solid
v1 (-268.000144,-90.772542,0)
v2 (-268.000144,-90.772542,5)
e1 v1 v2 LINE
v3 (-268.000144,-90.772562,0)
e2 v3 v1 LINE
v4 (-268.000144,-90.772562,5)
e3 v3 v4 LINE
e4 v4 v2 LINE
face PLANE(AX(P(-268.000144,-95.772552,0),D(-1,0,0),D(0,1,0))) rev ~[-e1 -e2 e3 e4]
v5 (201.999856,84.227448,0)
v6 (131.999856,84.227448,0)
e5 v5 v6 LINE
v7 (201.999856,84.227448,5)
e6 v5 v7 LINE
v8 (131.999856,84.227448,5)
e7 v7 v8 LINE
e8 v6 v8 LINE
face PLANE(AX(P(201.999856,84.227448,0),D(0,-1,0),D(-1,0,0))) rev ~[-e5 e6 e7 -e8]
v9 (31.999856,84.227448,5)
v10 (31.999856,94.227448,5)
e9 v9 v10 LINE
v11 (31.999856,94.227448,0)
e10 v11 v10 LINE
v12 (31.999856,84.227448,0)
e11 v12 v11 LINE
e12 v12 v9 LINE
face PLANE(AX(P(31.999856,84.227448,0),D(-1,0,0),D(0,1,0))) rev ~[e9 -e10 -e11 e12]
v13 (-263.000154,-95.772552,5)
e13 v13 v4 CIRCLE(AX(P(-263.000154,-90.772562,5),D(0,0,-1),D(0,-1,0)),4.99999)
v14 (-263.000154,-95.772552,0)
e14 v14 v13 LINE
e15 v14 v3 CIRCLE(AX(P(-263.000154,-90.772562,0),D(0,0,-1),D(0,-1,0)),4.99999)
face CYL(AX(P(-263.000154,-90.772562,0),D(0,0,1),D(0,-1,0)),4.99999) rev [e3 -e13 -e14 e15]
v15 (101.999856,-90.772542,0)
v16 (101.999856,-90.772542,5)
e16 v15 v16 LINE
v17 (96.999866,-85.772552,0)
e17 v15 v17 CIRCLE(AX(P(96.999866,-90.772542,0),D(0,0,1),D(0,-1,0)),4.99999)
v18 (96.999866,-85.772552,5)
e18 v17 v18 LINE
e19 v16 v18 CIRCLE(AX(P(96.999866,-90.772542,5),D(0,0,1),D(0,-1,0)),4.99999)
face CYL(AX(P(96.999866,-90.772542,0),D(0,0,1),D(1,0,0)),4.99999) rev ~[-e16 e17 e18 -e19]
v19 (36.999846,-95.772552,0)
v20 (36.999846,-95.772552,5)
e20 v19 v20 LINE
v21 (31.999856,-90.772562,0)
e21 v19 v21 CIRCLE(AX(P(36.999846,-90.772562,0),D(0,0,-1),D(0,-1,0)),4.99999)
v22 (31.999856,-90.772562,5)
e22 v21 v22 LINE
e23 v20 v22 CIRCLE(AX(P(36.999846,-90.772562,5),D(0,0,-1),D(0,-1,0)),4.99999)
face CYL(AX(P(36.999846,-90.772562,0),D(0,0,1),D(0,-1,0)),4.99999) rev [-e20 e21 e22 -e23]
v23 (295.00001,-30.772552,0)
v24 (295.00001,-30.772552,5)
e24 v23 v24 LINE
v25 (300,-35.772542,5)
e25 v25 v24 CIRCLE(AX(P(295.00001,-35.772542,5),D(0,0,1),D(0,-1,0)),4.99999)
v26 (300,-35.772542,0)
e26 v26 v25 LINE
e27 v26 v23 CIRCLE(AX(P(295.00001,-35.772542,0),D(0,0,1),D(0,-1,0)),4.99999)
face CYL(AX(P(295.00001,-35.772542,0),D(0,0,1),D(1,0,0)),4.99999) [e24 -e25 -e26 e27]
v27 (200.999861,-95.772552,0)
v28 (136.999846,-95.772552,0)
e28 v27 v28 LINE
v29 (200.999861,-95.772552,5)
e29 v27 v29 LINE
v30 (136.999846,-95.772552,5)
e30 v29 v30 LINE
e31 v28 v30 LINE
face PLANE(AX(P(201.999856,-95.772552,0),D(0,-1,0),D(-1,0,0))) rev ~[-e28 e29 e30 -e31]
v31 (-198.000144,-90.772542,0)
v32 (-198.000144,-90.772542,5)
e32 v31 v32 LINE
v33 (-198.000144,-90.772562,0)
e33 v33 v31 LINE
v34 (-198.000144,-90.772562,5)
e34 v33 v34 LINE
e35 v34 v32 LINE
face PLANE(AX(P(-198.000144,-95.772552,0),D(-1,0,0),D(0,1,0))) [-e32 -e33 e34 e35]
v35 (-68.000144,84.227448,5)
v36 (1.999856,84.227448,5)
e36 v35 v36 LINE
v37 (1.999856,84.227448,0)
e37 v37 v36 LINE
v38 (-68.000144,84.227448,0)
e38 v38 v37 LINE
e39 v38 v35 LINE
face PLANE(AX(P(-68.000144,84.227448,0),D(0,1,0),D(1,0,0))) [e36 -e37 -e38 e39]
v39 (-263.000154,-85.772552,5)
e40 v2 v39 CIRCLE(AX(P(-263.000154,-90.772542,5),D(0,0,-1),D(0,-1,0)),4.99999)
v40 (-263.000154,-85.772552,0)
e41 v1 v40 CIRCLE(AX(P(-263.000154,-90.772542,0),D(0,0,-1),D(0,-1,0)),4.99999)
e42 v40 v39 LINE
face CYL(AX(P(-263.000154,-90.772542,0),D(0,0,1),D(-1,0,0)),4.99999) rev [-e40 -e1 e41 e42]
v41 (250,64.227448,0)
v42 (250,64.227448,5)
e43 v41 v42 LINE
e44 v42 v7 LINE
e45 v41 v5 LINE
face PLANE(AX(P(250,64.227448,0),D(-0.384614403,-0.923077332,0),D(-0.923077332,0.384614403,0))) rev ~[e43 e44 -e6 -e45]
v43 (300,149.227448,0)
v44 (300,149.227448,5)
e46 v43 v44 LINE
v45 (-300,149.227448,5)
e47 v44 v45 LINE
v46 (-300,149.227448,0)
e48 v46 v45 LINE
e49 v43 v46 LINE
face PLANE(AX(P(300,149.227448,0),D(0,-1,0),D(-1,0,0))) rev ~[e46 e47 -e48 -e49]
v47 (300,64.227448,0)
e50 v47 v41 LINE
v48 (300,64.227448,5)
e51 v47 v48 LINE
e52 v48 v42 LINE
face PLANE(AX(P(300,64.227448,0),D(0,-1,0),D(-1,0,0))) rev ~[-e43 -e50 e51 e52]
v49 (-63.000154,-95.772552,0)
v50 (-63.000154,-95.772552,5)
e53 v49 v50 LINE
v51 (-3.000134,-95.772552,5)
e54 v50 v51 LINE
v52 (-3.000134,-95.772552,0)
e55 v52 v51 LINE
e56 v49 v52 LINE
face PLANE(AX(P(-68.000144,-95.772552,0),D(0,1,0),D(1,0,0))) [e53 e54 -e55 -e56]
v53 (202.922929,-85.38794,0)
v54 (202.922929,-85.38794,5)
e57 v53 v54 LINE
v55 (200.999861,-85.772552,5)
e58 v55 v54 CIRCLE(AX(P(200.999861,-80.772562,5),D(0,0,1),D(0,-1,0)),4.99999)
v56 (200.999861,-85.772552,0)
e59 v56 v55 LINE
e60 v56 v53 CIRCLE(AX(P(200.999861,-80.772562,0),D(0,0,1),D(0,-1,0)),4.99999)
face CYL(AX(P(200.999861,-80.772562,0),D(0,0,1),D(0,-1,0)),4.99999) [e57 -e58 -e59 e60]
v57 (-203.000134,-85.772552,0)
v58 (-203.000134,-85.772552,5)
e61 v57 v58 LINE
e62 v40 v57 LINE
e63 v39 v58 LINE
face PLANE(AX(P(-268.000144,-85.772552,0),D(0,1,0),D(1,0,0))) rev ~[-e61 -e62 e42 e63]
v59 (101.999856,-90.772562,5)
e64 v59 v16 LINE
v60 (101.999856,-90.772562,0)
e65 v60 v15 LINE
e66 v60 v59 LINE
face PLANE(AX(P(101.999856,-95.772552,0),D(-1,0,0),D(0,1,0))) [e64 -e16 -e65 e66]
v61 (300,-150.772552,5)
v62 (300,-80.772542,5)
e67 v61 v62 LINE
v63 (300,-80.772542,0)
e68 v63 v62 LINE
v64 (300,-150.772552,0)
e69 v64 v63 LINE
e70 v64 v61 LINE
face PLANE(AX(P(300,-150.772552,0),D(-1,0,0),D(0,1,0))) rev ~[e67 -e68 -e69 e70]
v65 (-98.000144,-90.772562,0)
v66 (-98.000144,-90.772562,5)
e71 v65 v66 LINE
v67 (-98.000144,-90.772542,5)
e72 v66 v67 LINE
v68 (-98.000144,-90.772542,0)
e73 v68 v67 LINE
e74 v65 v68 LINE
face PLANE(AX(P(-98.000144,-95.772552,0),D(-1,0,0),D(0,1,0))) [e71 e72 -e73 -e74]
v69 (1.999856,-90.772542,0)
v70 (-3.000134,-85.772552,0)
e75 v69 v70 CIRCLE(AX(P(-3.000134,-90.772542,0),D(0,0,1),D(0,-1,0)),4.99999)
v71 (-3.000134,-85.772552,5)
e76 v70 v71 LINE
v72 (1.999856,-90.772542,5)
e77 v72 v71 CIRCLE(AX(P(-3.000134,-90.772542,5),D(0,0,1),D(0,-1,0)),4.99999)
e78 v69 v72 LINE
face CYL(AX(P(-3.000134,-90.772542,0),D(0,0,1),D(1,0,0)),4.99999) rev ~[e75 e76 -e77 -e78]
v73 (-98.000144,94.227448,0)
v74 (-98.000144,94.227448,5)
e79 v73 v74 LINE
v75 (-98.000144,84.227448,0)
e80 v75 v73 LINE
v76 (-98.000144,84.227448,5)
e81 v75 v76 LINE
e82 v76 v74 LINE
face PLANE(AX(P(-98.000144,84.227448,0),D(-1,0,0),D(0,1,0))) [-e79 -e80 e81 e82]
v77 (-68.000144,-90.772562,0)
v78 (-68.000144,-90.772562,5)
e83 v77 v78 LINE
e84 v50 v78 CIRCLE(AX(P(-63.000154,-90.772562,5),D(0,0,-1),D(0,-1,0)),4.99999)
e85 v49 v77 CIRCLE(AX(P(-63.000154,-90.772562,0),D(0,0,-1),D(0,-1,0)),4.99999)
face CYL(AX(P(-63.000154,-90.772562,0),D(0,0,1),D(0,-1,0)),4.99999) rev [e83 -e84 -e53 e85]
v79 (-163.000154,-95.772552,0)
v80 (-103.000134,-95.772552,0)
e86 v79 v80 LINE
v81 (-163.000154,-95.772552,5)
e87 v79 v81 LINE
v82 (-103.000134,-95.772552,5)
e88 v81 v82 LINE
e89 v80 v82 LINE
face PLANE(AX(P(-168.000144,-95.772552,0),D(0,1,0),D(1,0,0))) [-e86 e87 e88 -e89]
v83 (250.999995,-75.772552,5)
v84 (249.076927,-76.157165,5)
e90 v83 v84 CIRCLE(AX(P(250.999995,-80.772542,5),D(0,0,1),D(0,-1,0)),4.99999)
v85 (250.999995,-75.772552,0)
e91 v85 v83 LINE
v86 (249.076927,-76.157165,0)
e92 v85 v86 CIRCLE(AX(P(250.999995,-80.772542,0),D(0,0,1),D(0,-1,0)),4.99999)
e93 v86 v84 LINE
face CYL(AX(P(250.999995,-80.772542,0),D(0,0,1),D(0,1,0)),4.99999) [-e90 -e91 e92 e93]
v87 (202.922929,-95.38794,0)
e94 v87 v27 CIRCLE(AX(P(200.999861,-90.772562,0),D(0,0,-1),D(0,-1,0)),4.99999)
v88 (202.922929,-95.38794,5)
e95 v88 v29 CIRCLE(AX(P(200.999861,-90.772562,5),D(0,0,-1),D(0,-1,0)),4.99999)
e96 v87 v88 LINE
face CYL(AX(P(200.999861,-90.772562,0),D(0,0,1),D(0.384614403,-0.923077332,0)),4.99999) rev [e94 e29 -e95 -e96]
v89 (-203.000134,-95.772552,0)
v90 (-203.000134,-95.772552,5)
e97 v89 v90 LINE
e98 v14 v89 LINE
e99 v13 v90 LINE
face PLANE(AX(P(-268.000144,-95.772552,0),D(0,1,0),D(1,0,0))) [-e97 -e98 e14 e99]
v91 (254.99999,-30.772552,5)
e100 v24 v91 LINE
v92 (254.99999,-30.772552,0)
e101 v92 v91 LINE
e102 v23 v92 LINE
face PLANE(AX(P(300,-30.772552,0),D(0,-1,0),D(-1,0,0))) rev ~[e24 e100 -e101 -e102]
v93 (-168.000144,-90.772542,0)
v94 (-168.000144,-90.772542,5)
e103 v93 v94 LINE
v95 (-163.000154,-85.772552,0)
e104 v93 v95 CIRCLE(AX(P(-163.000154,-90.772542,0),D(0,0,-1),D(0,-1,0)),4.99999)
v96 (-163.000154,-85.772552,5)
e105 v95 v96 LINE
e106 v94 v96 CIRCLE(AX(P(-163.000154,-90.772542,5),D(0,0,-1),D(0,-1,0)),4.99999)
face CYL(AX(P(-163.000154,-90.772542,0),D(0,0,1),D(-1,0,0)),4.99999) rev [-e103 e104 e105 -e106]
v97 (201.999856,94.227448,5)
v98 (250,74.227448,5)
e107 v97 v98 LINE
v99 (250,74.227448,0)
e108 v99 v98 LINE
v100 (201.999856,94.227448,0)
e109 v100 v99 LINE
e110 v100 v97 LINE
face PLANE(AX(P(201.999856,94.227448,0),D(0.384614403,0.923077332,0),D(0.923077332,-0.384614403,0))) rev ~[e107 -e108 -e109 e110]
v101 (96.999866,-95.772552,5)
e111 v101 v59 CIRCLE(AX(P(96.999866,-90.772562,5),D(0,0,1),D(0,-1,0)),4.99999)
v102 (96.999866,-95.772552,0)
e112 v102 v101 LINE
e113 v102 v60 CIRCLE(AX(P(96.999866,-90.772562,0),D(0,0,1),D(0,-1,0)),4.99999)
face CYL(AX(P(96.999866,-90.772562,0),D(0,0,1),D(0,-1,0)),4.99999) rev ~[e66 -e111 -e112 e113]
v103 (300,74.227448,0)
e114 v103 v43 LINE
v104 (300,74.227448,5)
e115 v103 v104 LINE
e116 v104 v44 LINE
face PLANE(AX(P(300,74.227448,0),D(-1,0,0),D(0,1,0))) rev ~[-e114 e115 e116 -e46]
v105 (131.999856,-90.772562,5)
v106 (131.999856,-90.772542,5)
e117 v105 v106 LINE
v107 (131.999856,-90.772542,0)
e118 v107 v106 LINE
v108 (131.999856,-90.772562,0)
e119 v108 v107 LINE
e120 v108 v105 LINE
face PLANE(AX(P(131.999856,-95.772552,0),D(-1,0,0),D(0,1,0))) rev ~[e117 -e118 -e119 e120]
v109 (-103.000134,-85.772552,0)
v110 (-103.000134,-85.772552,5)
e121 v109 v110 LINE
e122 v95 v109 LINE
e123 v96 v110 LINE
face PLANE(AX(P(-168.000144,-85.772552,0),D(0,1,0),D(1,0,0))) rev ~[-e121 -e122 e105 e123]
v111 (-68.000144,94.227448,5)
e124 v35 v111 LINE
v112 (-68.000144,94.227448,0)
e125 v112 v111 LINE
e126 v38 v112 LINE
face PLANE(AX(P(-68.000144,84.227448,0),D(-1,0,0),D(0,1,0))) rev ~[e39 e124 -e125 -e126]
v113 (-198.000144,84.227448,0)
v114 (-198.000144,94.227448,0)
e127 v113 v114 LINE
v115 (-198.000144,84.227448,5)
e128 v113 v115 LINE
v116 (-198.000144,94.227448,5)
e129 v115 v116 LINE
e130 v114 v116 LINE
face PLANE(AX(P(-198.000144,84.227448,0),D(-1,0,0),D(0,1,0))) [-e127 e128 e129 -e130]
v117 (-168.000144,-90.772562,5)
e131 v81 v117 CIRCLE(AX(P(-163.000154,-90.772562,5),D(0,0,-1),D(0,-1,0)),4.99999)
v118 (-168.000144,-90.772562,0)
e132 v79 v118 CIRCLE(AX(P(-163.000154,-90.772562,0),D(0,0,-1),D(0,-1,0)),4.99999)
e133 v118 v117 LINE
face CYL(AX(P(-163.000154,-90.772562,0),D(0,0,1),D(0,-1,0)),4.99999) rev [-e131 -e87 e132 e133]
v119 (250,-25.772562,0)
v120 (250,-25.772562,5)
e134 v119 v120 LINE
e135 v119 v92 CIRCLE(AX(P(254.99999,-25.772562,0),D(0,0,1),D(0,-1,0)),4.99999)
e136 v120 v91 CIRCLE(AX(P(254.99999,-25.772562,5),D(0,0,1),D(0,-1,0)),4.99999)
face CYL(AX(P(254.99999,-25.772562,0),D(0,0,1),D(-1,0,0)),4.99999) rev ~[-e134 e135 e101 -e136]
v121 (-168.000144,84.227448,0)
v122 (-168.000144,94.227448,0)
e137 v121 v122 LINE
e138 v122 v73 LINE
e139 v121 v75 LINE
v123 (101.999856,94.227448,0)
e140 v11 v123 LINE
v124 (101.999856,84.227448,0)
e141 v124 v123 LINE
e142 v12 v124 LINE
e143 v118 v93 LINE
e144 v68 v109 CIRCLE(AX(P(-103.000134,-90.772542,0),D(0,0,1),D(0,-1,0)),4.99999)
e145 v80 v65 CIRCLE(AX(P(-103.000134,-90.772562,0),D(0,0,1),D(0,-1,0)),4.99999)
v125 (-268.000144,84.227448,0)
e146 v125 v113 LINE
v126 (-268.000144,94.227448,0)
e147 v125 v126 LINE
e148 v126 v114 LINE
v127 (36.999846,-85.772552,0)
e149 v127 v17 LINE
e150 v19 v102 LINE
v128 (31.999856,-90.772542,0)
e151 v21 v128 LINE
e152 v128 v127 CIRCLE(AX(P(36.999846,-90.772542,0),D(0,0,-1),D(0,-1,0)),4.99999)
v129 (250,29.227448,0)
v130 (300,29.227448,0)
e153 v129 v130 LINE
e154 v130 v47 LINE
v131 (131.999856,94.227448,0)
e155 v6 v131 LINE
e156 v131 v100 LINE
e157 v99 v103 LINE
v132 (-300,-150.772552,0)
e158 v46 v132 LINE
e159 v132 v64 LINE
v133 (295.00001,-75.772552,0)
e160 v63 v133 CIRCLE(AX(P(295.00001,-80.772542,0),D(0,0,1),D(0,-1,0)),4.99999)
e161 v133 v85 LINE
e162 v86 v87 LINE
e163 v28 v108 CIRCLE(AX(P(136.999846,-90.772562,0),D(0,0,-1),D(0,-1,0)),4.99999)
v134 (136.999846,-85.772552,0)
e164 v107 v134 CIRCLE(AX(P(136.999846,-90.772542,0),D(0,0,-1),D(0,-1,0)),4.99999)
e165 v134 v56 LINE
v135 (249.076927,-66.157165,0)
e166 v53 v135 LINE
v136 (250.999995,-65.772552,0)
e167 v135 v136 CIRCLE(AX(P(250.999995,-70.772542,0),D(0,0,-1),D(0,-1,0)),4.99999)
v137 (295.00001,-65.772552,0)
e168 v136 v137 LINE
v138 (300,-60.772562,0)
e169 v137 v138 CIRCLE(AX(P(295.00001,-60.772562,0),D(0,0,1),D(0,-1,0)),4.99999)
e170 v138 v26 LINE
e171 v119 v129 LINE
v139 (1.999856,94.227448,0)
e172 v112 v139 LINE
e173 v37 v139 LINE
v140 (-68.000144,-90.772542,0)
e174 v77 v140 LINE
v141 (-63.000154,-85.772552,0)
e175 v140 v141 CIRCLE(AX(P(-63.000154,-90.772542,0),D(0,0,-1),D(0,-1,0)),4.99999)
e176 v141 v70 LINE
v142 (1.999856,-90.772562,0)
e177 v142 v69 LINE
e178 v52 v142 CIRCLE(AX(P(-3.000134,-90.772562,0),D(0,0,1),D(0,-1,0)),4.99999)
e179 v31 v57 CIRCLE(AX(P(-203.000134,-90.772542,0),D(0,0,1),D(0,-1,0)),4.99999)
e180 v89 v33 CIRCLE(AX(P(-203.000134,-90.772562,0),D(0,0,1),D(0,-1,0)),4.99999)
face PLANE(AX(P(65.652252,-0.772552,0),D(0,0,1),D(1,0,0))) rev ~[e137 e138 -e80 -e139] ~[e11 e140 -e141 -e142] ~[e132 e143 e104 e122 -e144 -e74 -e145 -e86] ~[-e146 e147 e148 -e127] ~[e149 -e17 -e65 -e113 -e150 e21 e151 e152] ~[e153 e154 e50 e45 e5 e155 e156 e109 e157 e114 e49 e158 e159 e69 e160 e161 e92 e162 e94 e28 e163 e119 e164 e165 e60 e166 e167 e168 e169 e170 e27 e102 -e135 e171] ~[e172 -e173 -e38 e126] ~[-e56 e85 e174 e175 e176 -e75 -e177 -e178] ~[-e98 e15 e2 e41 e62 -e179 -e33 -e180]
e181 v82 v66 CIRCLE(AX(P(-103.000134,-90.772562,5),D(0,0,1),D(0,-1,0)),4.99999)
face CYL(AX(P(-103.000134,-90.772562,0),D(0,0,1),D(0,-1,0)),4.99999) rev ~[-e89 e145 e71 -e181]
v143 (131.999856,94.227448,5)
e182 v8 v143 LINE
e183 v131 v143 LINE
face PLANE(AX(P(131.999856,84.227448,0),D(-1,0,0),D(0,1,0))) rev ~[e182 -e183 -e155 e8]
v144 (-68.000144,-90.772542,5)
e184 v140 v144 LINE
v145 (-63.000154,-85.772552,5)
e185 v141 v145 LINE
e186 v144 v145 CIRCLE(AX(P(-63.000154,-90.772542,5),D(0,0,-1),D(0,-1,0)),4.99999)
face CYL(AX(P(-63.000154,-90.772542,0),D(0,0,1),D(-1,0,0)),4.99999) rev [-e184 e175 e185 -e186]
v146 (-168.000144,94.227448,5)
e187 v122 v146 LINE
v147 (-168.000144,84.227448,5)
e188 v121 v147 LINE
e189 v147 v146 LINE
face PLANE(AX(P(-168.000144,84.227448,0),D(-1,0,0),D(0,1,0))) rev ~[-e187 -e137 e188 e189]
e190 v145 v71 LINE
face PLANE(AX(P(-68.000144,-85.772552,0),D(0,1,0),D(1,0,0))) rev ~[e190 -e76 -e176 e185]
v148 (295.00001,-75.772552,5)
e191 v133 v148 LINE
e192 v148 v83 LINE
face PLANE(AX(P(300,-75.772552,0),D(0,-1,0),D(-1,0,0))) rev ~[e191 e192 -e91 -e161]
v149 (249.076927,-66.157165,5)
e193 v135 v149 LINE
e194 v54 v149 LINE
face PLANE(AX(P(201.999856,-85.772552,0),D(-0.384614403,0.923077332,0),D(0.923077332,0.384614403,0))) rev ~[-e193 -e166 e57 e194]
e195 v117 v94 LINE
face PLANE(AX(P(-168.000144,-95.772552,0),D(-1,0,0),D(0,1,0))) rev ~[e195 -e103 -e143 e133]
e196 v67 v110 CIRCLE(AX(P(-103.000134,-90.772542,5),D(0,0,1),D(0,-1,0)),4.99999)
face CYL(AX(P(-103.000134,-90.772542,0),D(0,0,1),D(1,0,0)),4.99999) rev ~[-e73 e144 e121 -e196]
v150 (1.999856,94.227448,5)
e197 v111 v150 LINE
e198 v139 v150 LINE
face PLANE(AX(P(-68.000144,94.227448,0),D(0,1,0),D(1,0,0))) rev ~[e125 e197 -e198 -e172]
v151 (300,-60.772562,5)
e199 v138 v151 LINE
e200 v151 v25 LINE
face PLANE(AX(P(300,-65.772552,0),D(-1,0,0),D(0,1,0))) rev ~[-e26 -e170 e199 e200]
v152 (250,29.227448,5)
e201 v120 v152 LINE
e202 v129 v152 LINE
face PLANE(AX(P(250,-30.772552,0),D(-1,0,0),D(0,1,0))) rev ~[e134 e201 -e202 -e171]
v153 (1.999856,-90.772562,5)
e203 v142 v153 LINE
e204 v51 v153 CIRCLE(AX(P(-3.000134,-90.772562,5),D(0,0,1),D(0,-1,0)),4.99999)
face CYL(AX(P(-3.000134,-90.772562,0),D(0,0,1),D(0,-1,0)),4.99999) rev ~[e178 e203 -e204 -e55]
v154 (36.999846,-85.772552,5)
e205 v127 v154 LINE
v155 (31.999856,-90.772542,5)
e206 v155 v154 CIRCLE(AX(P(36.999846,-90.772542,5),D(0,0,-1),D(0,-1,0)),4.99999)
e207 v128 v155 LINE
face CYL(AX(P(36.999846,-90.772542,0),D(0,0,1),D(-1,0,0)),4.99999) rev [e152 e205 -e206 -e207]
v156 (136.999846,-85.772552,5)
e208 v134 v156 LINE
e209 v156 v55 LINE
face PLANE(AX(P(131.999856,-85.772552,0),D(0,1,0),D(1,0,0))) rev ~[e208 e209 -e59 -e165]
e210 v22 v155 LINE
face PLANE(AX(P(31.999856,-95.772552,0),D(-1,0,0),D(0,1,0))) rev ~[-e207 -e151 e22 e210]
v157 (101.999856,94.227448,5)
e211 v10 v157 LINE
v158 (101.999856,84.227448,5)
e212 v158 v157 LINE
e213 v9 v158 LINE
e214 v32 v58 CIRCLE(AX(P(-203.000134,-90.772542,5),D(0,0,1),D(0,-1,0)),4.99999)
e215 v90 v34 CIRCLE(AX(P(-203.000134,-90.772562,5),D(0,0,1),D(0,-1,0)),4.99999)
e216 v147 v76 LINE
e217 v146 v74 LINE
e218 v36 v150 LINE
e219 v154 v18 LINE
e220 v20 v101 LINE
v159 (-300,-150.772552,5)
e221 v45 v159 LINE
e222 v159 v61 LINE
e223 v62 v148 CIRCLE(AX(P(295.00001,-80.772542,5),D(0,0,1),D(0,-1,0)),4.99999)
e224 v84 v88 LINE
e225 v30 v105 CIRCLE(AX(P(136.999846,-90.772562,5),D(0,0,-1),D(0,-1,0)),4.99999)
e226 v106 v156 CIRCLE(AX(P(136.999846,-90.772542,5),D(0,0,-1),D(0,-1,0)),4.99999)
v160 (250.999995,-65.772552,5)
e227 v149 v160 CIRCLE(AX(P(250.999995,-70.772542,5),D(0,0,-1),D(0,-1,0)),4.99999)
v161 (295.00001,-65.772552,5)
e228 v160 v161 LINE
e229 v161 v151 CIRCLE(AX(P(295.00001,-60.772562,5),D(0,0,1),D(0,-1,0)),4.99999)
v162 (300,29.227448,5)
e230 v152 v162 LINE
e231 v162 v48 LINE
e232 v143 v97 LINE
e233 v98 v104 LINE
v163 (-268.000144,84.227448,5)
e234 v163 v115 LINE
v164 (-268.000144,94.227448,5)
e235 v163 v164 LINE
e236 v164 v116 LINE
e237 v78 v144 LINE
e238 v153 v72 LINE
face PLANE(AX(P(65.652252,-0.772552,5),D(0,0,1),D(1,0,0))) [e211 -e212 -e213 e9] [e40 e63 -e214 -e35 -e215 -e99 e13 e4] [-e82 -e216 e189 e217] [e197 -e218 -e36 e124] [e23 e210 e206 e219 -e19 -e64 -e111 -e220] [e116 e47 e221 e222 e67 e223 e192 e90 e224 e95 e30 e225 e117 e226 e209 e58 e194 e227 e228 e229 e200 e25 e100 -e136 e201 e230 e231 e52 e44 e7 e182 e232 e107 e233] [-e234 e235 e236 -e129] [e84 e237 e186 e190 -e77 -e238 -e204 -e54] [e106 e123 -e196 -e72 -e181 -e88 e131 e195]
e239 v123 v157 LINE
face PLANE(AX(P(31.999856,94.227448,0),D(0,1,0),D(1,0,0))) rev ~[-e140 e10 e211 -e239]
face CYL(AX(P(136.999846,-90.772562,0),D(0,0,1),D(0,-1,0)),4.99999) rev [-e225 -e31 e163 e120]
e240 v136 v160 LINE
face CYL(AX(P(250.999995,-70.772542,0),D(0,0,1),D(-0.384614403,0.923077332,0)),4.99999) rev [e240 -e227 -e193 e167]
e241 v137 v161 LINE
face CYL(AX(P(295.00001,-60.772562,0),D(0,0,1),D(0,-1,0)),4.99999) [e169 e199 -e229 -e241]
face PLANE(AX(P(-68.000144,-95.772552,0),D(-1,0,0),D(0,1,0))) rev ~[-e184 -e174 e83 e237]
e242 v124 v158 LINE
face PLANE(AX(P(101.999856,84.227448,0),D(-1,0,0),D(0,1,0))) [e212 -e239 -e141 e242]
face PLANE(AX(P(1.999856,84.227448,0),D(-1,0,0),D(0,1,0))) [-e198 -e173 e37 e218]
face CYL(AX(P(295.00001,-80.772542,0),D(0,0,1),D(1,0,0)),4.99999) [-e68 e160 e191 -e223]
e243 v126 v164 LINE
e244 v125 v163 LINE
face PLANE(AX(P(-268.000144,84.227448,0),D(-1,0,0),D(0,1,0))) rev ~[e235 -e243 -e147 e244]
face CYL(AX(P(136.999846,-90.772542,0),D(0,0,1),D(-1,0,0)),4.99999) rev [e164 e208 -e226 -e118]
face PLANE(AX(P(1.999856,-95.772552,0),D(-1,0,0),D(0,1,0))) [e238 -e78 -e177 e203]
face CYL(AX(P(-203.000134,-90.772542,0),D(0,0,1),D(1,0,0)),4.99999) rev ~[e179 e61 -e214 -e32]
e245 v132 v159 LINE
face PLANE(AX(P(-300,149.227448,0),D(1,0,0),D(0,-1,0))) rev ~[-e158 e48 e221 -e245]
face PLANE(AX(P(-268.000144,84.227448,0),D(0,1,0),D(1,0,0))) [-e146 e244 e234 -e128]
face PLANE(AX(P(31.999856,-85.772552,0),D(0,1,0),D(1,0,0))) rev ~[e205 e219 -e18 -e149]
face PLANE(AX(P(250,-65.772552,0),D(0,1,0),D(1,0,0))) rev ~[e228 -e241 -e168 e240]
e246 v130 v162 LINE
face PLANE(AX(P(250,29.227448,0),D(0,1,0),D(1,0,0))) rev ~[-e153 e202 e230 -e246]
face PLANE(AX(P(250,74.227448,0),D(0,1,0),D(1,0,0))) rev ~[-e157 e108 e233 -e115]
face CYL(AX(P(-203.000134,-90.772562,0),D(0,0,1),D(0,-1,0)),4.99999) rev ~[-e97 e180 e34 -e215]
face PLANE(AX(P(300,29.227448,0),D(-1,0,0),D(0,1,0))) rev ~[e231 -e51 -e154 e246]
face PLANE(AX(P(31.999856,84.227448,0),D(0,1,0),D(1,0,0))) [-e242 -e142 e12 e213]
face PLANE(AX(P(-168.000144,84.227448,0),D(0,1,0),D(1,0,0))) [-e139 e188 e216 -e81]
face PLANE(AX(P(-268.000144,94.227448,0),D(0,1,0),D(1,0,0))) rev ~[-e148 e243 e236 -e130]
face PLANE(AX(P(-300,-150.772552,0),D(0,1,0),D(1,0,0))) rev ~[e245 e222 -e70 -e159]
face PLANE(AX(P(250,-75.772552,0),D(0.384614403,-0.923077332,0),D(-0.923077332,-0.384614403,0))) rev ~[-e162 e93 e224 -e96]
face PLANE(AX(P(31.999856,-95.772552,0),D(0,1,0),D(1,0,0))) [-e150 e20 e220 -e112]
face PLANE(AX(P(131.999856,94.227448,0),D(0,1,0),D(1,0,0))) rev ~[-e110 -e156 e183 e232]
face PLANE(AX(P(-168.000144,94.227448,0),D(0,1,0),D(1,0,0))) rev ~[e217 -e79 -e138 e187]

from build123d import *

# Parameters (mm, degrees)
F0_W     = 70
F0_H     = 10
F1_DEPTH = 5
F2_R     = 4.99999


# Not quite as in the source:
# - a fillet or chamfer is up to 0.001 mm smaller than in the source, because OpenCascade refuses the exact size


with BuildPart() as f1:
    # F0 (on Top) → F1 (new body)
    with BuildSketch(Plane.XY):
        Polygon((300, 149.2274475843), (-300, 149.2274475843), (-300, -150.7725524157), (300, -150.7725524157), (300, -75.7725524157), (250, -75.7725524157), (201.9998562336, -95.7725524157), (131.9998562336, -95.7725524157), (131.9998562336, -85.7725524157), (201.9998562336, -85.7725524157), (250, -65.7725524157), (300, -65.7725524157), (300, -30.7725524157), (250, -30.7725524157), (250, 29.2274475843), (300, 29.2274475843), (300, 64.2274475843), (250, 64.2274475843), (201.9998562336, 84.2274475843), (131.9998562336, 84.2274475843), (131.9998562336, 94.2274475843), (201.9998562336, 94.2274475843), (250, 74.2274475843), (300, 74.2274475843), align=None)
        with Locations((-233.0001437664, -90.7725524157)):
            Rectangle(F0_W, F0_H, mode=Mode.SUBTRACT)
        with Locations((-133.0001437664, -90.7725524157)):
            Rectangle(F0_W, F0_H, mode=Mode.SUBTRACT)
        with Locations((-33.0001437664, -90.7725524157)):
            Rectangle(F0_W, F0_H, mode=Mode.SUBTRACT)
        with Locations((66.9998562336, -90.7725524157)):
            Rectangle(F0_W, F0_H, mode=Mode.SUBTRACT)
        with Locations((-233.0001437664, 89.2274475843)):
            Rectangle(F0_W, F0_H, mode=Mode.SUBTRACT)
        with Locations((-133.0001437664, 89.2274475843)):
            Rectangle(F0_W, F0_H, mode=Mode.SUBTRACT)
        with Locations((-33.0001437664, 89.2274475843)):
            Rectangle(F0_W, F0_H, mode=Mode.SUBTRACT)
        with Locations((66.9998562336, 89.2274475843)):
            Rectangle(F0_W, F0_H, mode=Mode.SUBTRACT)
    extrude(amount=F1_DEPTH)

    # F2 (radius 5 in the source; OpenCascade refuses exactly that, so slightly less here)
    f2_edges = [f1.edges().sort_by_distance(p)[0] for p in [
        (131.999856, -95.772552, 2.5),
        (31.999856, -95.772552, 2.5),
        (-68.000144, -95.772552, 2.5),
        (201.999856, -95.772552, 2.5),
        (250, -75.772552, 2.5),
        (-168.000144, -95.772552, 2.5),
        (-268.000144, -95.772552, 2.5),
        (300, -75.772552, 2.5),
        (300, -65.772552, 2.5),
        (300, -30.772552, 2.5),
        (250, -30.772552, 2.5),
        (250, -65.772552, 2.5),
        (201.999856, -85.772552, 2.5),
        (131.999856, -85.772552, 2.5),
        (101.999856, -85.772552, 2.5),
        (1.999856, -85.772552, 2.5),
        (-98.000144, -85.772552, 2.5),
        (-198.000144, -85.772552, 2.5),
        (31.999856, -85.772552, 2.5),
        (-68.000144, -85.772552, 2.5),
        (-168.000144, -85.772552, 2.5),
        (-268.000144, -85.772552, 2.5),
        (101.999856, -95.772552, 2.5),
        (1.999856, -95.772552, 2.5),
        (-98.000144, -95.772552, 2.5),
        (-198.000144, -95.772552, 2.5),
    ]]
    fillet(f2_edges, radius=F2_R)


solid = f1.part
